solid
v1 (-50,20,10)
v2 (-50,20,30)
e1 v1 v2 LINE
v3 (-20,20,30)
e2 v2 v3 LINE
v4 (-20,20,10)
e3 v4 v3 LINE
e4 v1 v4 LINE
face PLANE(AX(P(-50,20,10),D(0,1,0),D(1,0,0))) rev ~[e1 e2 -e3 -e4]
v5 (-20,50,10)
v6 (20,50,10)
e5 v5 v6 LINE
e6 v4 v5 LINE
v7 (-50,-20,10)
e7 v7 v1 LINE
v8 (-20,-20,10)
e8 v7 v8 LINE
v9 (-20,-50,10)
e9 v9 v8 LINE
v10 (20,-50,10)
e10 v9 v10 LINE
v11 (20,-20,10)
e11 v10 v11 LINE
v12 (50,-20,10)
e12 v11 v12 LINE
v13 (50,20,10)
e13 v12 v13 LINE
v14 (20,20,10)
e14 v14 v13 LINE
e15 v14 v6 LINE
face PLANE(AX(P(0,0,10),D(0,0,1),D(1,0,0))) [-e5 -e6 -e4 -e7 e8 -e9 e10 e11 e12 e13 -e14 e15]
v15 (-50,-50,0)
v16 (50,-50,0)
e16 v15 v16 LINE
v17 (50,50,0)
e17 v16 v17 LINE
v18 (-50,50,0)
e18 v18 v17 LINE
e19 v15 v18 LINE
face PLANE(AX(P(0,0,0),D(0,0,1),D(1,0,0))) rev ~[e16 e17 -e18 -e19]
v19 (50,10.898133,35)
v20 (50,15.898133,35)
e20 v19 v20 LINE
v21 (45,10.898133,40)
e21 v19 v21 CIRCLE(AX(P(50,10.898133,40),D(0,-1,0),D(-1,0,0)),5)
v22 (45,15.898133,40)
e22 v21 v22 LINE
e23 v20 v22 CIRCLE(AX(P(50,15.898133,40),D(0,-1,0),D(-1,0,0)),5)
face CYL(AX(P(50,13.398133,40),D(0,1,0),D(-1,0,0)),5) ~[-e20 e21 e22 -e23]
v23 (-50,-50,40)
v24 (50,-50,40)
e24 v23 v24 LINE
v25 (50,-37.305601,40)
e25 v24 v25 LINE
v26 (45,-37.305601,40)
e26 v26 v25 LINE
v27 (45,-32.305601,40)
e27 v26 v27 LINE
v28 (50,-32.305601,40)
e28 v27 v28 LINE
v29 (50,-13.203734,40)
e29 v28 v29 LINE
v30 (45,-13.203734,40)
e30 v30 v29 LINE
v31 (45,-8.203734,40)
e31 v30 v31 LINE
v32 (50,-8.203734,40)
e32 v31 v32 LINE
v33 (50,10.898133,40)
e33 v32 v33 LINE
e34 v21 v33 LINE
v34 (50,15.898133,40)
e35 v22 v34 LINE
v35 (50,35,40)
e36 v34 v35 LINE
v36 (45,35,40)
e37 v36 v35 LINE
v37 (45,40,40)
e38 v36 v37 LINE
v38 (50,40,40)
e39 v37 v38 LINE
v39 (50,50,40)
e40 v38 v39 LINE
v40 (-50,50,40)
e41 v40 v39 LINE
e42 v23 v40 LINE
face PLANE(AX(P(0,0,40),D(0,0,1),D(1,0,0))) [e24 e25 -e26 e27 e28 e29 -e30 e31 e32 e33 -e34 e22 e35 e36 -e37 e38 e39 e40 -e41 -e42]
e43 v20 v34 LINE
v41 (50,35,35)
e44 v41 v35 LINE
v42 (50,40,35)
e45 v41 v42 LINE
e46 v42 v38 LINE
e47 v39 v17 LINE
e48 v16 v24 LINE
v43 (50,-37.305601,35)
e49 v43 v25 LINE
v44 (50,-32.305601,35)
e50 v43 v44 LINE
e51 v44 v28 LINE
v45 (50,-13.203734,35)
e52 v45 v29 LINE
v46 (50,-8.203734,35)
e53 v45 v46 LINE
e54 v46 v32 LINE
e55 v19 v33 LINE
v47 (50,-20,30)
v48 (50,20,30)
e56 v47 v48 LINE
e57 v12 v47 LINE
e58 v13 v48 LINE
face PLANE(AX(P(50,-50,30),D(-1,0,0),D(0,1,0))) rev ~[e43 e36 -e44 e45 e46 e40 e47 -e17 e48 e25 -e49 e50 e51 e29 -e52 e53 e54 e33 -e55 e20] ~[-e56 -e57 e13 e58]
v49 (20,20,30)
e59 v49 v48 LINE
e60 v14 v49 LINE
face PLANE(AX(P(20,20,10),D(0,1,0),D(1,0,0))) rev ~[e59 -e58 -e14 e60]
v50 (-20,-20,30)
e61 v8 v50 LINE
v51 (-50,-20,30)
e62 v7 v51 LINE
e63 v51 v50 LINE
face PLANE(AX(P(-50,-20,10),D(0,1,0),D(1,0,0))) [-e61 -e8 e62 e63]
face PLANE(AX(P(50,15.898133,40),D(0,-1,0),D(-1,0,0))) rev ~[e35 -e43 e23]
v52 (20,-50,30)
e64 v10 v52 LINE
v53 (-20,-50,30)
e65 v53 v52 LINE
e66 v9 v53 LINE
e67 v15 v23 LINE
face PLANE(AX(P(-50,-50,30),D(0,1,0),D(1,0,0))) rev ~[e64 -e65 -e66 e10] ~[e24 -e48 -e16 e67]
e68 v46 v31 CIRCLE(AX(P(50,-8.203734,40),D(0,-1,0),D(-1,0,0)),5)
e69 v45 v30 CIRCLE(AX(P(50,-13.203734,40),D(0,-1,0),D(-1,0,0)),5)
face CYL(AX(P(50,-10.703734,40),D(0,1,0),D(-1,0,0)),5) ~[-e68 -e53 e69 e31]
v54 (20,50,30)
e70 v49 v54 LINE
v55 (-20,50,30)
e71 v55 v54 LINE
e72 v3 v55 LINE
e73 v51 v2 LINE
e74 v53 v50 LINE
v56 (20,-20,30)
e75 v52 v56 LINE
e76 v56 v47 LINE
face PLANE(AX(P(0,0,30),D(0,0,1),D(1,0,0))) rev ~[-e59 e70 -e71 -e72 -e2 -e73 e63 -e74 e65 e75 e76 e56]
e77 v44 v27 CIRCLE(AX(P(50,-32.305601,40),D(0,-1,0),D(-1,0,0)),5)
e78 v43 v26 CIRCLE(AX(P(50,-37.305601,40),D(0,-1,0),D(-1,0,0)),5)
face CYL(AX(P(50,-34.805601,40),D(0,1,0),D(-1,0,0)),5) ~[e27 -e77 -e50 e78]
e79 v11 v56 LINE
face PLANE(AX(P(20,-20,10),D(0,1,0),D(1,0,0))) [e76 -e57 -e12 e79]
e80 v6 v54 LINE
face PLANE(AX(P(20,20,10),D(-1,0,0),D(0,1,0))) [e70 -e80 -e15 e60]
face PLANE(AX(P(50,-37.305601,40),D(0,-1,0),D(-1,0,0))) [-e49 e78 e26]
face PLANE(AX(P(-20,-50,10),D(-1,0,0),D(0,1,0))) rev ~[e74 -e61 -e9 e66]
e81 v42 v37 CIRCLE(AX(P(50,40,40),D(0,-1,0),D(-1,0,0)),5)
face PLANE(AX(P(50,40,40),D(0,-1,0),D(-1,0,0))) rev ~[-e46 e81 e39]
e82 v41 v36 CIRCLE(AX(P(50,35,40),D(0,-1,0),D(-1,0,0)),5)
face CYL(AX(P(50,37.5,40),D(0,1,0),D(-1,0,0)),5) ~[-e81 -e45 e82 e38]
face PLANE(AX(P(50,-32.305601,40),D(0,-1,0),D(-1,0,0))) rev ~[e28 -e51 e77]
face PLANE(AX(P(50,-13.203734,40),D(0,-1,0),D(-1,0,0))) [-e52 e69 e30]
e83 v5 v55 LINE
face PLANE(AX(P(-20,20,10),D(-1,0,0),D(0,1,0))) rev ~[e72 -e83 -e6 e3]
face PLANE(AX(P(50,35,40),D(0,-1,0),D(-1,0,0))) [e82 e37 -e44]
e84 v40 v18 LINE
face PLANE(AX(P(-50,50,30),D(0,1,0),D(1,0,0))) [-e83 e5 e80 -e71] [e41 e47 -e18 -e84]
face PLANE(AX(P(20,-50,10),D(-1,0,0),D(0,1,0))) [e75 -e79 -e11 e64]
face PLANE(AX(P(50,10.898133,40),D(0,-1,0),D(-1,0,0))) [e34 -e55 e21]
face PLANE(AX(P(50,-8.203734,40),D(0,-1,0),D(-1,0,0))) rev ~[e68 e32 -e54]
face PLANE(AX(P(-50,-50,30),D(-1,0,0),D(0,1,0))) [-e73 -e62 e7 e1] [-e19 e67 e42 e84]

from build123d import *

# Parameters (mm, degrees)
F0_W     = 100
F0_H     = 100
F1_DEPTH = 10
F2_W     = 30
F2_H     = 30
F3_DEPTH = 20
F5_W     = 100
F5_H     = 100
F6_DEPTH = 10
F7_W     = 5
F7_H     = 5


with BuildPart() as f1:
    # F0 (on Top) → F1 (new body)
    with BuildSketch(Plane.XY):
        Rectangle(F0_W, F0_H)
    extrude(amount=F1_DEPTH)

    # F2 (on face) → F3 (join)
    with BuildSketch(Plane.XY.offset(10)):
        with Locations((-35, 35)):
            Rectangle(F2_W, F2_H)
        with Locations((35, 35)):
            Rectangle(F2_W, F2_H)
        with Locations((-35, -35)):
            Rectangle(F2_W, F2_H)
        with Locations((35, -35)):
            Rectangle(F2_W, F2_H)
    extrude(amount=F3_DEPTH)

    # F5 (on offset) → F6 (join)
    with BuildSketch(Plane.XY.offset(30)):
        Rectangle(F5_W, F5_H)
    extrude(amount=F6_DEPTH)

    # F7 (on face) → F8 (revolve)
    with BuildSketch(Plane.XY.offset(40)):
        with Locations((47.5, 37.5)):
            Rectangle(F7_W, F7_H)
        with Locations((47.5, 13.3981328524)):
            Rectangle(F7_W, F7_H)
        with Locations((47.5, -10.7037342952)):
            Rectangle(F7_W, F7_H)
        with Locations((47.5, -34.8056014428)):
            Rectangle(F7_W, F7_H)
    revolve(axis=Axis((50, 0, 40), (0, -1, 0)))


solid = f1.part
